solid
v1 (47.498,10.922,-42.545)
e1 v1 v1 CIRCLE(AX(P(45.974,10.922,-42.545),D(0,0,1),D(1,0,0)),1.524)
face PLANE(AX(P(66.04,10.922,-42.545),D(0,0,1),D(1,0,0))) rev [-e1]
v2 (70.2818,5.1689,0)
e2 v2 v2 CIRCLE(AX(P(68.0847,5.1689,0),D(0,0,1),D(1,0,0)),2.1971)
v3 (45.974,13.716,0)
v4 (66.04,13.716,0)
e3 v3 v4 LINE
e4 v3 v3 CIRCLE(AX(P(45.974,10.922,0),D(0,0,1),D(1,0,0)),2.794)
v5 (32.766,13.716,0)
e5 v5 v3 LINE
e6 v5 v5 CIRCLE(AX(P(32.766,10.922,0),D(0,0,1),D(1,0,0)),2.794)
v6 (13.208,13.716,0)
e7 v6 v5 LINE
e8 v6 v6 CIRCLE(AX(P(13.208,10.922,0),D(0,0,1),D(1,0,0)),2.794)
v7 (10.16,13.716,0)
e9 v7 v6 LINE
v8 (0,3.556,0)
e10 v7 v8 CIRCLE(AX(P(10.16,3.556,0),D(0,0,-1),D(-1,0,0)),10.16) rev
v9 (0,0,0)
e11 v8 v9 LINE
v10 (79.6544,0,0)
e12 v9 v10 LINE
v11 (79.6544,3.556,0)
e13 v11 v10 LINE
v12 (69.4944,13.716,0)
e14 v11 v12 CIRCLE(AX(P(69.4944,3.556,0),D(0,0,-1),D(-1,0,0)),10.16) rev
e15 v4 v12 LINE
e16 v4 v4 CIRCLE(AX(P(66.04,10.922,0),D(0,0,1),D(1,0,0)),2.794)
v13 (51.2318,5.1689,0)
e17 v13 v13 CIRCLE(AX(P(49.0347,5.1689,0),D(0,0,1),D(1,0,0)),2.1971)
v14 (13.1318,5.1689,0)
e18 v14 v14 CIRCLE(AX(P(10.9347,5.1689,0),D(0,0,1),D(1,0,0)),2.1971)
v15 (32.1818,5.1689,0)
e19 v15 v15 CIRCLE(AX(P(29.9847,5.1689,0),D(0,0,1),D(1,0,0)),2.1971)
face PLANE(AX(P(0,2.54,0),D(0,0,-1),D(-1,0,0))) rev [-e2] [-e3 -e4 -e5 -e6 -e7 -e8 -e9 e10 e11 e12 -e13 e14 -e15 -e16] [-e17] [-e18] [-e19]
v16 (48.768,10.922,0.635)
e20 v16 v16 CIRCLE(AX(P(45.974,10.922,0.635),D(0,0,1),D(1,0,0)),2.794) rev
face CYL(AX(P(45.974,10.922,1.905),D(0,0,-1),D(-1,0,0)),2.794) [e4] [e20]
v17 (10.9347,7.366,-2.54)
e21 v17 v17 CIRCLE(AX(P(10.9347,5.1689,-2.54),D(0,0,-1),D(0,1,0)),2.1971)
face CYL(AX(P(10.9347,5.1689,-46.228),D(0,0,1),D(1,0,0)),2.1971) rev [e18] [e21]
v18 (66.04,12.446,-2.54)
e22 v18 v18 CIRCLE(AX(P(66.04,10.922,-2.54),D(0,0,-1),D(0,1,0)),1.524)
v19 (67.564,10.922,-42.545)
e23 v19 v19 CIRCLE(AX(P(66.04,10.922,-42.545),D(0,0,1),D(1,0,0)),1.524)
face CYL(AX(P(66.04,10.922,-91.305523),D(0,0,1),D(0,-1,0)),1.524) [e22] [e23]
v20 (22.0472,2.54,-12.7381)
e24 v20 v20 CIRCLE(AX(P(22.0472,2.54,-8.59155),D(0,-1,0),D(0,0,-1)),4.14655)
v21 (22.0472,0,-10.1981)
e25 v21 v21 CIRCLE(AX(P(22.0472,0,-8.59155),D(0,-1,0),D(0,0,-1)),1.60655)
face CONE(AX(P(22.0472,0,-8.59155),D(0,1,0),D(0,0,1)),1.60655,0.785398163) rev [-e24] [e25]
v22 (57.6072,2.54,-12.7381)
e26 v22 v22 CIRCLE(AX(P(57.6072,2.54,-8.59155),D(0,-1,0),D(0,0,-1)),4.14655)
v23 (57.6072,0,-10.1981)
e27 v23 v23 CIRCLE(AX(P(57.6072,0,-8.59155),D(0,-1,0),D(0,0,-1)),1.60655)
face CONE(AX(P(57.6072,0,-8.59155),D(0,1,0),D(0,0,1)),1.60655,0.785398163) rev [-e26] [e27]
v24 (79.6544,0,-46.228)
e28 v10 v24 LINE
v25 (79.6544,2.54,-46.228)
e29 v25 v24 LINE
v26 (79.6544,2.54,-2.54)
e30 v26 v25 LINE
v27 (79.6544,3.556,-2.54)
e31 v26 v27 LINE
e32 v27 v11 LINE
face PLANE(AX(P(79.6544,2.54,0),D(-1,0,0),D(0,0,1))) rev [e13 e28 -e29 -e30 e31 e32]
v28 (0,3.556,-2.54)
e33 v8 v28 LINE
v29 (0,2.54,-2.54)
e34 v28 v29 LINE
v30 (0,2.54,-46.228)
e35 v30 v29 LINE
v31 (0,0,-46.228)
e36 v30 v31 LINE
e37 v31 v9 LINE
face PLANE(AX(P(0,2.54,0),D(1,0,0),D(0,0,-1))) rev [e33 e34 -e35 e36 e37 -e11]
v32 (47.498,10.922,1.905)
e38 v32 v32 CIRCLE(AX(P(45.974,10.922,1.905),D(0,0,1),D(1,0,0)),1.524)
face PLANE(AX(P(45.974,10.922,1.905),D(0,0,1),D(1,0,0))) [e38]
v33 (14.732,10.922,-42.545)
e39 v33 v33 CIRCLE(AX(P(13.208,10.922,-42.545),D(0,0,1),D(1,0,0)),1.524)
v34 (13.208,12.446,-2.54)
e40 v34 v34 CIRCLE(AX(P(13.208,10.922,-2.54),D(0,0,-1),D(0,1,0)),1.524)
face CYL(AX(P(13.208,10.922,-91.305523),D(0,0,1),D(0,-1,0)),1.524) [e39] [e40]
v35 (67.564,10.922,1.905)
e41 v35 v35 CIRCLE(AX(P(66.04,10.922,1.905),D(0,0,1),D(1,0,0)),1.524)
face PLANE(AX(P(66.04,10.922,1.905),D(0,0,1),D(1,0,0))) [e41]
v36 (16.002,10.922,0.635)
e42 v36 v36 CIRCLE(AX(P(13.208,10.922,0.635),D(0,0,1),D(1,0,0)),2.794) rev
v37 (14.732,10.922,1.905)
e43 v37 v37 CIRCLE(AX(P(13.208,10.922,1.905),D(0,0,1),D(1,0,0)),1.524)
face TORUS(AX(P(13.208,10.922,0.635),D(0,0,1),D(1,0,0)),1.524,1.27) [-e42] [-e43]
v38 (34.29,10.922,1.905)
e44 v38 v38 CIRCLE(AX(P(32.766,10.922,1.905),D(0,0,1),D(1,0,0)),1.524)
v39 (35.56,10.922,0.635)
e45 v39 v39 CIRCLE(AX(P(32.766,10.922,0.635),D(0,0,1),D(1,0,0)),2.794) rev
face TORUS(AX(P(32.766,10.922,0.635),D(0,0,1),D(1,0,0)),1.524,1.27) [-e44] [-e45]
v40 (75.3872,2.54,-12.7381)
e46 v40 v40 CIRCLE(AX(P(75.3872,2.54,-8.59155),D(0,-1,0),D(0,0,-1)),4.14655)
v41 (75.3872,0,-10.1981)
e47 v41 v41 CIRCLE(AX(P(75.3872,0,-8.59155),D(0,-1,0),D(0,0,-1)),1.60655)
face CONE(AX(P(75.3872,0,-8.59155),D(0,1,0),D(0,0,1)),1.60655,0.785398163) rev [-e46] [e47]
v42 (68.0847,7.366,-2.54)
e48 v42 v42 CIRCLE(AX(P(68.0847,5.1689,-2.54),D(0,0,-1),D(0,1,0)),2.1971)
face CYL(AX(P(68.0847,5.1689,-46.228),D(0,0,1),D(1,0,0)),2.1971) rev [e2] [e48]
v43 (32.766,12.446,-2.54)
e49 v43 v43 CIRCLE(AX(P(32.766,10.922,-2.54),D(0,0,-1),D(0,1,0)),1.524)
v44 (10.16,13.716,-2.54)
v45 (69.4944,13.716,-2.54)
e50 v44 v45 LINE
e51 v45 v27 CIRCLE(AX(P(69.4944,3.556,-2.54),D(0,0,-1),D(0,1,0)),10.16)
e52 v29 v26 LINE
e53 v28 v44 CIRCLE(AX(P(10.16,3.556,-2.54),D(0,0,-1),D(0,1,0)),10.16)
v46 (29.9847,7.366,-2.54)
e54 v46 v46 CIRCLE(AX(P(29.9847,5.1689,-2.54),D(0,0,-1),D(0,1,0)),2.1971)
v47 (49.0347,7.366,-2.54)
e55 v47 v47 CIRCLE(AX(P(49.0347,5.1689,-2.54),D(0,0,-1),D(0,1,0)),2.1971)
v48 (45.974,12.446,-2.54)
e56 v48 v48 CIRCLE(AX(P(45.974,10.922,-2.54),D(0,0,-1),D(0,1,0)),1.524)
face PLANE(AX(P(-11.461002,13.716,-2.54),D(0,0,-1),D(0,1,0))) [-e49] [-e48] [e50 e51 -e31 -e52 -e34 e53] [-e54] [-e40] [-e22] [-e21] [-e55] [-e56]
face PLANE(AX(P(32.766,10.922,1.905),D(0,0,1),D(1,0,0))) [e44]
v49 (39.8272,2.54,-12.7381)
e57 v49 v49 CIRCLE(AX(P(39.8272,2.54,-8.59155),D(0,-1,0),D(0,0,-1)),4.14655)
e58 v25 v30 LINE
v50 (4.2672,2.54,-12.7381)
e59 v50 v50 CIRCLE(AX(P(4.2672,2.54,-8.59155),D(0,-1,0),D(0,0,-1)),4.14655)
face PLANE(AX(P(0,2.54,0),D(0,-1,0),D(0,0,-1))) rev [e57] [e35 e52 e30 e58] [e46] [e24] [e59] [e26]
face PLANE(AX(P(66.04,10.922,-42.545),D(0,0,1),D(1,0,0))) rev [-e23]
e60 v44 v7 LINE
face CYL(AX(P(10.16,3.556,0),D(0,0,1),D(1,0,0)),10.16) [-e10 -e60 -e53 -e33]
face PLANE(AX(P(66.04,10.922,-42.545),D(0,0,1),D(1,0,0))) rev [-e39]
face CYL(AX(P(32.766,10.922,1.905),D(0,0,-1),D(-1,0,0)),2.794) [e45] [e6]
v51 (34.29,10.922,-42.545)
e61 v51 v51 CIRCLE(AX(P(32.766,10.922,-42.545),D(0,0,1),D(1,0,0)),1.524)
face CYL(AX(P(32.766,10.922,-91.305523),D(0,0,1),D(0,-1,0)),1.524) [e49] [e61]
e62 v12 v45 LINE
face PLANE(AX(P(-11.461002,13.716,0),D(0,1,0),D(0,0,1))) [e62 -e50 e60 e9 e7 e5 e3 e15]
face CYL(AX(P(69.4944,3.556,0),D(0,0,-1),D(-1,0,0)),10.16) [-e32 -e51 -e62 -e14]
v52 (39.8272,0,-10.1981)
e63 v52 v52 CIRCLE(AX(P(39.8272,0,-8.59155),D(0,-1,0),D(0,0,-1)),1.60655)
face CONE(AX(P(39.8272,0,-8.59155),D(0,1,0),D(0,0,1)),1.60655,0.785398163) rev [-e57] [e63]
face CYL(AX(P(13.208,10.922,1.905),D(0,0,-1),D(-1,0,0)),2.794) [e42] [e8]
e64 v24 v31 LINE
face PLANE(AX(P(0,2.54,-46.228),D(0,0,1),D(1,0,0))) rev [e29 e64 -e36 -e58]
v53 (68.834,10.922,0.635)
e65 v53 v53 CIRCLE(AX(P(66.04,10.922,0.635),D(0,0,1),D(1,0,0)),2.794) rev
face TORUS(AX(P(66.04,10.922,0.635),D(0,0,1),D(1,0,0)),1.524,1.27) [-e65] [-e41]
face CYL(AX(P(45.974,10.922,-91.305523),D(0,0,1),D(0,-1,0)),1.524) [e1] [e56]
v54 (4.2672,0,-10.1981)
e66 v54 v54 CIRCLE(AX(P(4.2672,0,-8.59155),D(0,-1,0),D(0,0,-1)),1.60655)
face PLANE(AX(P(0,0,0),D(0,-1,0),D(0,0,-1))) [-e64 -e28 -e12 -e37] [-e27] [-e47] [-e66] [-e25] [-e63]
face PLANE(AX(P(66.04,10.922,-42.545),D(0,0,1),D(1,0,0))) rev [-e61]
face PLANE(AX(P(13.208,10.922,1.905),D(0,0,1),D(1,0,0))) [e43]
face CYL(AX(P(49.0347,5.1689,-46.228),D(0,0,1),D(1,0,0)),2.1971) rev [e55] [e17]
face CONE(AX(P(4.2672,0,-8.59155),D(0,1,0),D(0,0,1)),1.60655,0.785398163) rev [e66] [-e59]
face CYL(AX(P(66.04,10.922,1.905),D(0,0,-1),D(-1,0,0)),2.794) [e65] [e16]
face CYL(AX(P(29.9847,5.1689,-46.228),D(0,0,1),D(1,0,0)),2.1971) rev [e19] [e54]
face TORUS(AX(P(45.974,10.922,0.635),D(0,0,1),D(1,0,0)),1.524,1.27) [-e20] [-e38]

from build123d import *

# Parameters (mm, degrees)
SKETCH1_W           = 79.6544
SKETCH1_H           = 46.228
BOSS_EXTRUDE1_DEPTH = 2.54
SKETCH2_W           = 2.54
SKETCH2_H           = 11.176
BOSS_EXTRUDE2_DEPTH = 79.6544
SKETCH3_R           = 2.1971
CUT_EXTRUDE1_DEPTH  = 94.112727805
SKETCH4_R           = 2.794
BOSS_EXTRUDE3_DEPTH = 1.905
FILLET1_R           = 10.16
FILLET2_R           = 1.27
SKETCH5_R           = 1.524
BOSS_EXTRUDE4_DEPTH = 40.005
SKETCH6_R           = 1.60655
CUT_EXTRUDE2_DEPTH  = 2.54
CHAMFER1_SIZE       = 2.54


with BuildPart() as part:
    # Sketch1 → Boss-Extrude1 (new body)
    with BuildSketch(Plane(origin=(0, 0, 0), x_dir=(1, 0, 0), z_dir=(0, 1, 0))):
        with Locations((39.8272, 23.114)):
            Rectangle(SKETCH1_W, SKETCH1_H)
    extrude(amount=BOSS_EXTRUDE1_DEPTH)

    # Sketch2 → Boss-Extrude2 (add)
    with BuildSketch(Plane(origin=(79.6544, 0, 0), x_dir=(0, 0, -1), z_dir=(1, 0, 0))):
        with Locations((1.27, 8.128)):
            Rectangle(SKETCH2_W, SKETCH2_H)
    extrude(amount=-BOSS_EXTRUDE2_DEPTH)

    # Sketch3 → Cut-Extrude1 (cut, through all)
    with BuildSketch(Plane.XY):
        with Locations((10.9347, 5.1689)):
            Circle(SKETCH3_R)
        with Locations((29.9847, 5.1689)):
            Circle(SKETCH3_R)
        with Locations((49.0347, 5.1689)):
            Circle(SKETCH3_R)
        with Locations((68.0847, 5.1689)):
            Circle(SKETCH3_R)
    extrude(amount=-CUT_EXTRUDE1_DEPTH, mode=Mode.SUBTRACT)

    # Sketch4 → Boss-Extrude3 (add)
    with BuildSketch(Plane.XY):
        with Locations(Location((13.208, 10.922, 0), (0, 0, 90))):
            Circle(SKETCH4_R)
        with Locations(Location((32.766, 10.922, 0), (0, 0, 90))):
            Circle(SKETCH4_R)
        with Locations(Location((45.974, 10.922, 0), (0, 0, 90))):
            Circle(SKETCH4_R)
        with Locations(Location((66.04, 10.922, 0), (0, 0, 90))):
            Circle(SKETCH4_R)
    extrude(amount=BOSS_EXTRUDE3_DEPTH)

    # Fillet1
    fillet1_edges = [part.edges().sort_by_distance(p)[0] for p in [
        (79.6544, 13.716, -1.27),
        (0, 13.716, -1.27),
    ]]
    fillet(fillet1_edges, radius=FILLET1_R)

    # Fillet2
    fillet2_edges = [part.edges().sort_by_distance(p)[0] for p in [
        (13.208, 8.128, 1.905),
        (32.766, 8.128, 1.905),
        (45.974, 8.128, 1.905),
        (66.04, 8.128, 1.905),
    ]]
    fillet(fillet2_edges, radius=FILLET2_R)

    # Sketch5 → Boss-Extrude4 (add)
    with BuildSketch(Plane(origin=(0, 0, -2.54), x_dir=(-1, 0, 0), z_dir=(0, 0, -1))):
        with Locations(Location((-66.04, 10.922, 0), (0, 0, 180))):
            Circle(SKETCH5_R)
        with Locations(Location((-45.974, 10.922, 0), (0, 0, 180))):
            Circle(SKETCH5_R)
        with Locations(Location((-32.766, 10.922, 0), (0, 0, 180))):
            Circle(SKETCH5_R)
        with Locations(Location((-13.208, 10.922, 0), (0, 0, 180))):
            Circle(SKETCH5_R)
    extrude(amount=BOSS_EXTRUDE4_DEPTH)

    # Sketch6 → Cut-Extrude2 (cut)
    with BuildSketch(Plane.XZ):
        with BuildLine():
            ThreePointArc((41.43375, -8.59155), (40.963202399, -7.455547601), (39.8272, -6.985))
            Line((39.8272, -6.985), (39.8272, -8.59155))
            Line((39.8272, -8.59155), (38.22065, -8.59155))
            ThreePointArc((38.22065, -8.59155), (39.8272, -10.1981), (41.43375, -8.59155))
        make_face()
        with BuildLine():
            Line((39.8272, -8.59155), (39.8272, -6.985))
            ThreePointArc((39.8272, -6.985), (38.691197601, -7.455547601), (38.22065, -8.59155))
            Line((38.22065, -8.59155), (39.8272, -8.59155))
        make_face()
        with Locations(Location((57.6072, -8.59155, 0), (0, 0, 270))):
            Circle(SKETCH6_R)
        with Locations(Location((22.0472, -8.59155, 0), (0, 0, 270))):
            Circle(SKETCH6_R)
        with Locations(Location((4.2672, -8.59155, 0), (0, 0, 270))):
            Circle(SKETCH6_R)
        with Locations(Location((75.3872, -8.59155, 0), (0, 0, 270))):
            Circle(SKETCH6_R)
    extrude(amount=-CUT_EXTRUDE2_DEPTH, mode=Mode.SUBTRACT)

    # Chamfer1
    chamfer1_edges = [part.edges().sort_by_distance(p)[0] for p in [
        (57.6072, 2.54, -6.985),
        (22.0472, 2.54, -6.985),
        (4.2672, 2.54, -6.985),
        (75.3872, 2.54, -6.985),
        (38.22065, 2.54, -8.59155),
    ]]
    chamfer(chamfer1_edges, length=CHAMFER1_SIZE - 0.0001)  # a hair under: the kernel refuses the full size


solid = part.part
